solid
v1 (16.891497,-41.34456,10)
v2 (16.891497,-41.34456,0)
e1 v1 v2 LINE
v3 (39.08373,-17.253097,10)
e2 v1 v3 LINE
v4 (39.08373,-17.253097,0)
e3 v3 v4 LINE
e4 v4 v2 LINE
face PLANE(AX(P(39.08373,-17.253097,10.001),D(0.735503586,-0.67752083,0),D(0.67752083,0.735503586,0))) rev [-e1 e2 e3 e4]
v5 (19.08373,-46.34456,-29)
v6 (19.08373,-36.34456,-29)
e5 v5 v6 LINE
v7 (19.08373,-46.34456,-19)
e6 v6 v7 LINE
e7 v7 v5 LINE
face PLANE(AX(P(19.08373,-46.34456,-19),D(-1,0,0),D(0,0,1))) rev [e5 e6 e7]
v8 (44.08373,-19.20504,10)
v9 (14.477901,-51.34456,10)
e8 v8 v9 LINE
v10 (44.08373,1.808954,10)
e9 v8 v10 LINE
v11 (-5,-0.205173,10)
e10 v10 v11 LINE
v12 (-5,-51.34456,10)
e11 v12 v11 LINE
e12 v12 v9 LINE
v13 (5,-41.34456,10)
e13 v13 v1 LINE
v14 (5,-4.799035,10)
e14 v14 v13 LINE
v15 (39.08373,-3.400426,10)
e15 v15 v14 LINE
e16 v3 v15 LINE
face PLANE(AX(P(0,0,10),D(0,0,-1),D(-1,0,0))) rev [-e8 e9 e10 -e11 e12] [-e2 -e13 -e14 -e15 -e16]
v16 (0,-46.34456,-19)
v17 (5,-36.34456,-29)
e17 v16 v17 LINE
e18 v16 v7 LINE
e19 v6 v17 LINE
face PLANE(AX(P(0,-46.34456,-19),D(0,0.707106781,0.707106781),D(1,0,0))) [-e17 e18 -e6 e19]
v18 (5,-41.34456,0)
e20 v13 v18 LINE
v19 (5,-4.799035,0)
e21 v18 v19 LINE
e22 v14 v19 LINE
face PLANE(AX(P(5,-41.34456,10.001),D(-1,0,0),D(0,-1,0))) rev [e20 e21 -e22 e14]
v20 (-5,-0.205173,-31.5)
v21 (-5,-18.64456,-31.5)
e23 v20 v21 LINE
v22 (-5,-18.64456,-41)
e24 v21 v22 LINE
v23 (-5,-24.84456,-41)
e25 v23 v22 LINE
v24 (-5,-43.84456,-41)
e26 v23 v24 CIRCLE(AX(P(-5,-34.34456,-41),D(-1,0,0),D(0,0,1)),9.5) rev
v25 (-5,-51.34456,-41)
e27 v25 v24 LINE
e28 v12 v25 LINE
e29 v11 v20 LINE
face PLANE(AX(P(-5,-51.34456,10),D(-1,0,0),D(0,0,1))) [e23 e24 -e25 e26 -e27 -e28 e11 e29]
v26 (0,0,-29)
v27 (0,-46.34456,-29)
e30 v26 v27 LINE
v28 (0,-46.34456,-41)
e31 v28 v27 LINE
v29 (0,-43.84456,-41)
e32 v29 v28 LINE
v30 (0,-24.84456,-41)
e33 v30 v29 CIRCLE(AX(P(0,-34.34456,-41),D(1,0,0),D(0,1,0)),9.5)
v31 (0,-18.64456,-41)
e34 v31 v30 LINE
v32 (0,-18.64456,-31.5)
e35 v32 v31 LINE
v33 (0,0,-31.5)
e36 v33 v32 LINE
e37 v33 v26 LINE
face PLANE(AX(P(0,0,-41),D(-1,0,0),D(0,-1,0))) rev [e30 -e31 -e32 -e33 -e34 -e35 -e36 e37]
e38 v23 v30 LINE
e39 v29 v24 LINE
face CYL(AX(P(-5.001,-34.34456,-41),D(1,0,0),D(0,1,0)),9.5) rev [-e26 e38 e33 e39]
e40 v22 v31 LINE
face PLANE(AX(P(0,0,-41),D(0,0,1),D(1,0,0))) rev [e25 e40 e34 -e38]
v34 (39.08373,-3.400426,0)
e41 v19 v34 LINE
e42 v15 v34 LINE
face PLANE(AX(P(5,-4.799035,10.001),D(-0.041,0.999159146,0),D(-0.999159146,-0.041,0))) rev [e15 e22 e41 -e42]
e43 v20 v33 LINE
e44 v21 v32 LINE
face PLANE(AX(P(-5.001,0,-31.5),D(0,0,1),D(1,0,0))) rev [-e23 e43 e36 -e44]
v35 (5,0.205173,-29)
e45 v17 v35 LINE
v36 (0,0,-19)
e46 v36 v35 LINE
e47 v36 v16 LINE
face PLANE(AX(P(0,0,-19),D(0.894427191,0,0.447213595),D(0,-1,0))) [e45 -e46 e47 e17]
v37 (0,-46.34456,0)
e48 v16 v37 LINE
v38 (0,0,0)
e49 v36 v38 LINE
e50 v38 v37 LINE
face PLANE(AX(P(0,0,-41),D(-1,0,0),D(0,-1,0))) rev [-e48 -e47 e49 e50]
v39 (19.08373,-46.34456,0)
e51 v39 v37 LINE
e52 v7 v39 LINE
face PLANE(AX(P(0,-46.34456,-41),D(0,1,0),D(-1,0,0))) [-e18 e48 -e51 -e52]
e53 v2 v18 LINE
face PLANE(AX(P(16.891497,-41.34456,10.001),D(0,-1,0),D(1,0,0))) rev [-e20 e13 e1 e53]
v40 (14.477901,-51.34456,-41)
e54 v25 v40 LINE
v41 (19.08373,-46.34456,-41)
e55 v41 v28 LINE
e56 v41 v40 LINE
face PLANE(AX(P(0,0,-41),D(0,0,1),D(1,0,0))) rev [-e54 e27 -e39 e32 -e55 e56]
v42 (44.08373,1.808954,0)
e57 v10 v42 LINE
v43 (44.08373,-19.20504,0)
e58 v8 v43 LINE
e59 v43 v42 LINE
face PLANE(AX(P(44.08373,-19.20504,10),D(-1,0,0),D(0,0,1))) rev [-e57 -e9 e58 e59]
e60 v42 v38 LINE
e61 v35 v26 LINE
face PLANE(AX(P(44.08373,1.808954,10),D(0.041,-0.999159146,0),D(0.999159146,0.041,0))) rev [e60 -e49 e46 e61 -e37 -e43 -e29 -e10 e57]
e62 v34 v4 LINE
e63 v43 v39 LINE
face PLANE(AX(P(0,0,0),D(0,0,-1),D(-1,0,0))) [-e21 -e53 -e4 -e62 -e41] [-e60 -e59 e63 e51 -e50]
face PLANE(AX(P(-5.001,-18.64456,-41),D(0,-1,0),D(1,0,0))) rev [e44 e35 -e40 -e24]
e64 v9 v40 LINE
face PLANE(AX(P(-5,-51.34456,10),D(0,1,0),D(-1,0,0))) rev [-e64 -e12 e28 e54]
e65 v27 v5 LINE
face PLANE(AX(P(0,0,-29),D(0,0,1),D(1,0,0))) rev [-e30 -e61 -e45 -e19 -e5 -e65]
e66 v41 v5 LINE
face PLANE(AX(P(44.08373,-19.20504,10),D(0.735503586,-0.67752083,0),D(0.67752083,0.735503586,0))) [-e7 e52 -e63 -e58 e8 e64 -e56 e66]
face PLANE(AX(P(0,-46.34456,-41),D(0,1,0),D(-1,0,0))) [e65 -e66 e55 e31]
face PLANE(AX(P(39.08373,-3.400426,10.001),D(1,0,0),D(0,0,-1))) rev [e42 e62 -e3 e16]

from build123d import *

# Parameters (mm, degrees)
BOSS_EXTRUDE1_DEPTH = 10
BOSS_EXTRUDE6_DEPTH = 41
CUT_EXTRUDE1_REACH  = 81.124
SKETCH6_R           = 9.5
SKETCH6_W           = 9.5
SKETCH6_H           = 18.644559606
CUT_EXTRUDE2_REACH  = 81.124
BOSS_EXTRUDE9_DEPTH = 10
CHAMFER2_SIZE       = 5
CHAMFER2_SIZE_2     = 10
CHAMFER3_SIZE       = 10


# Some blends are built 0.0001 mm under size
with BuildPart() as part:
    # Sketch2 → Boss-Extrude1 (new body)
    with BuildSketch(Plane.XY):
        Polygon((-5, -51.344559606), (-5, -0.20517252), (44.083730464, 1.808954014), (44.083730464, -19.205040291), (14.477900916, -51.344559606), align=None)
    extrude(amount=BOSS_EXTRUDE1_DEPTH)

    # Sketch2<5> → Boss-Extrude6 (add)
    with BuildSketch(Plane.XY):
        Polygon((-5, -0.20517252), (-5, -51.344559606), (14.477900916, -51.344559606), (19.083730464, -46.344559606), (0, -46.344559606), (0, 0), align=None)
    extrude(amount=-BOSS_EXTRUDE6_DEPTH)

    # Sketch6 → Cut-Extrude1 (cut, up to next)
    with BuildSketch(Plane(origin=(0, 0, 0), x_dir=(0, 0, -1), z_dir=(1, 0, 0)), mode=Mode.PRIVATE) as cut_extrude1_sk1:
        with Locations((41, -34.344559606)):
            Circle(SKETCH6_R)
    cut_extrude1_tool1 = extrude(cut_extrude1_sk1.sketch, amount=-CUT_EXTRUDE1_REACH, mode=Mode.PRIVATE) & part.part
    # Sketch6 → Cut-Extrude1 (cut, up to next)
    with BuildSketch(Plane(origin=(0, 0, 0), x_dir=(0, 0, -1), z_dir=(1, 0, 0)), mode=Mode.PRIVATE) as cut_extrude1_sk2:
        with Locations((36.25, -9.322279803)):
            Rectangle(SKETCH6_W, SKETCH6_H)
    cut_extrude1_tool2 = extrude(cut_extrude1_sk2.sketch, amount=-CUT_EXTRUDE1_REACH, mode=Mode.PRIVATE) & part.part
    add(cut_extrude1_tool1.solids().sort_by_distance((0, -34.34456, -41))[0], mode=Mode.SUBTRACT)
    add(cut_extrude1_tool2.solids().sort_by_distance((0, -9.32228, -36.25))[0], mode=Mode.SUBTRACT)

    # Sketch7 → Cut-Extrude2 (cut, up to next)
    with BuildSketch(Plane(origin=(0, 0, 0), x_dir=(-1, 0, 0), z_dir=(0, 0, -1)), mode=Mode.PRIVATE) as cut_extrude2_sk1:
        Polygon((-39.083730464, -17.253097249), (-16.891496625, -41.344559606), (-5, -41.344559606), (-5, -4.799035286), (-39.083730464, -3.400426311), align=None)
    cut_extrude2_tool1 = extrude(cut_extrude2_sk1.sketch, amount=-CUT_EXTRUDE2_REACH, mode=Mode.PRIVATE) & part.part
    add(cut_extrude2_tool1.solids().sort_by_distance((19.604261, -19.893914, 0))[0], mode=Mode.SUBTRACT)

    # Sketch10 → Boss-Extrude9 (add)
    with BuildSketch(Plane.XY.offset(-29)):
        Polygon((19.083730464, -46.344559606), (0, -46.344559606), (0, 0), (5, 0.20517252), (5, -36.344559606), (19.083730464, -36.344559606), align=None)
    extrude(amount=BOSS_EXTRUDE9_DEPTH)

    # Chamfer2
    # the kernel refuses this chamfer: 10, 5 mm, written as the material it takes off along each edge
    with BuildSketch(Plane(origin=(5, 26.103461258, -19), x_dir=(-0.9976223042390326, 0, 0.0689183436017091), z_dir=(0, -1, 0))) as chamfer2_piece_1:
        Polygon((CHAMFER2_SIZE * 0.997622304239, CHAMFER2_SIZE * 0.0689183436017), (-CHAMFER2_SIZE_2 * 0.0689183436017, CHAMFER2_SIZE_2 * 0.997622304239), (0, 0), align=None)
    extrude(amount=62.448020863, mode=Mode.SUBTRACT)

    # Chamfer3
    chamfer3_edges = [part.edges().sort_by_distance(p)[0] for p in [
        (9.541865232, -36.344559606, -19),
    ]]
    chamfer(chamfer3_edges, length=CHAMFER3_SIZE - 0.0001)  # a hair under: the kernel refuses the full size


solid = part.part
